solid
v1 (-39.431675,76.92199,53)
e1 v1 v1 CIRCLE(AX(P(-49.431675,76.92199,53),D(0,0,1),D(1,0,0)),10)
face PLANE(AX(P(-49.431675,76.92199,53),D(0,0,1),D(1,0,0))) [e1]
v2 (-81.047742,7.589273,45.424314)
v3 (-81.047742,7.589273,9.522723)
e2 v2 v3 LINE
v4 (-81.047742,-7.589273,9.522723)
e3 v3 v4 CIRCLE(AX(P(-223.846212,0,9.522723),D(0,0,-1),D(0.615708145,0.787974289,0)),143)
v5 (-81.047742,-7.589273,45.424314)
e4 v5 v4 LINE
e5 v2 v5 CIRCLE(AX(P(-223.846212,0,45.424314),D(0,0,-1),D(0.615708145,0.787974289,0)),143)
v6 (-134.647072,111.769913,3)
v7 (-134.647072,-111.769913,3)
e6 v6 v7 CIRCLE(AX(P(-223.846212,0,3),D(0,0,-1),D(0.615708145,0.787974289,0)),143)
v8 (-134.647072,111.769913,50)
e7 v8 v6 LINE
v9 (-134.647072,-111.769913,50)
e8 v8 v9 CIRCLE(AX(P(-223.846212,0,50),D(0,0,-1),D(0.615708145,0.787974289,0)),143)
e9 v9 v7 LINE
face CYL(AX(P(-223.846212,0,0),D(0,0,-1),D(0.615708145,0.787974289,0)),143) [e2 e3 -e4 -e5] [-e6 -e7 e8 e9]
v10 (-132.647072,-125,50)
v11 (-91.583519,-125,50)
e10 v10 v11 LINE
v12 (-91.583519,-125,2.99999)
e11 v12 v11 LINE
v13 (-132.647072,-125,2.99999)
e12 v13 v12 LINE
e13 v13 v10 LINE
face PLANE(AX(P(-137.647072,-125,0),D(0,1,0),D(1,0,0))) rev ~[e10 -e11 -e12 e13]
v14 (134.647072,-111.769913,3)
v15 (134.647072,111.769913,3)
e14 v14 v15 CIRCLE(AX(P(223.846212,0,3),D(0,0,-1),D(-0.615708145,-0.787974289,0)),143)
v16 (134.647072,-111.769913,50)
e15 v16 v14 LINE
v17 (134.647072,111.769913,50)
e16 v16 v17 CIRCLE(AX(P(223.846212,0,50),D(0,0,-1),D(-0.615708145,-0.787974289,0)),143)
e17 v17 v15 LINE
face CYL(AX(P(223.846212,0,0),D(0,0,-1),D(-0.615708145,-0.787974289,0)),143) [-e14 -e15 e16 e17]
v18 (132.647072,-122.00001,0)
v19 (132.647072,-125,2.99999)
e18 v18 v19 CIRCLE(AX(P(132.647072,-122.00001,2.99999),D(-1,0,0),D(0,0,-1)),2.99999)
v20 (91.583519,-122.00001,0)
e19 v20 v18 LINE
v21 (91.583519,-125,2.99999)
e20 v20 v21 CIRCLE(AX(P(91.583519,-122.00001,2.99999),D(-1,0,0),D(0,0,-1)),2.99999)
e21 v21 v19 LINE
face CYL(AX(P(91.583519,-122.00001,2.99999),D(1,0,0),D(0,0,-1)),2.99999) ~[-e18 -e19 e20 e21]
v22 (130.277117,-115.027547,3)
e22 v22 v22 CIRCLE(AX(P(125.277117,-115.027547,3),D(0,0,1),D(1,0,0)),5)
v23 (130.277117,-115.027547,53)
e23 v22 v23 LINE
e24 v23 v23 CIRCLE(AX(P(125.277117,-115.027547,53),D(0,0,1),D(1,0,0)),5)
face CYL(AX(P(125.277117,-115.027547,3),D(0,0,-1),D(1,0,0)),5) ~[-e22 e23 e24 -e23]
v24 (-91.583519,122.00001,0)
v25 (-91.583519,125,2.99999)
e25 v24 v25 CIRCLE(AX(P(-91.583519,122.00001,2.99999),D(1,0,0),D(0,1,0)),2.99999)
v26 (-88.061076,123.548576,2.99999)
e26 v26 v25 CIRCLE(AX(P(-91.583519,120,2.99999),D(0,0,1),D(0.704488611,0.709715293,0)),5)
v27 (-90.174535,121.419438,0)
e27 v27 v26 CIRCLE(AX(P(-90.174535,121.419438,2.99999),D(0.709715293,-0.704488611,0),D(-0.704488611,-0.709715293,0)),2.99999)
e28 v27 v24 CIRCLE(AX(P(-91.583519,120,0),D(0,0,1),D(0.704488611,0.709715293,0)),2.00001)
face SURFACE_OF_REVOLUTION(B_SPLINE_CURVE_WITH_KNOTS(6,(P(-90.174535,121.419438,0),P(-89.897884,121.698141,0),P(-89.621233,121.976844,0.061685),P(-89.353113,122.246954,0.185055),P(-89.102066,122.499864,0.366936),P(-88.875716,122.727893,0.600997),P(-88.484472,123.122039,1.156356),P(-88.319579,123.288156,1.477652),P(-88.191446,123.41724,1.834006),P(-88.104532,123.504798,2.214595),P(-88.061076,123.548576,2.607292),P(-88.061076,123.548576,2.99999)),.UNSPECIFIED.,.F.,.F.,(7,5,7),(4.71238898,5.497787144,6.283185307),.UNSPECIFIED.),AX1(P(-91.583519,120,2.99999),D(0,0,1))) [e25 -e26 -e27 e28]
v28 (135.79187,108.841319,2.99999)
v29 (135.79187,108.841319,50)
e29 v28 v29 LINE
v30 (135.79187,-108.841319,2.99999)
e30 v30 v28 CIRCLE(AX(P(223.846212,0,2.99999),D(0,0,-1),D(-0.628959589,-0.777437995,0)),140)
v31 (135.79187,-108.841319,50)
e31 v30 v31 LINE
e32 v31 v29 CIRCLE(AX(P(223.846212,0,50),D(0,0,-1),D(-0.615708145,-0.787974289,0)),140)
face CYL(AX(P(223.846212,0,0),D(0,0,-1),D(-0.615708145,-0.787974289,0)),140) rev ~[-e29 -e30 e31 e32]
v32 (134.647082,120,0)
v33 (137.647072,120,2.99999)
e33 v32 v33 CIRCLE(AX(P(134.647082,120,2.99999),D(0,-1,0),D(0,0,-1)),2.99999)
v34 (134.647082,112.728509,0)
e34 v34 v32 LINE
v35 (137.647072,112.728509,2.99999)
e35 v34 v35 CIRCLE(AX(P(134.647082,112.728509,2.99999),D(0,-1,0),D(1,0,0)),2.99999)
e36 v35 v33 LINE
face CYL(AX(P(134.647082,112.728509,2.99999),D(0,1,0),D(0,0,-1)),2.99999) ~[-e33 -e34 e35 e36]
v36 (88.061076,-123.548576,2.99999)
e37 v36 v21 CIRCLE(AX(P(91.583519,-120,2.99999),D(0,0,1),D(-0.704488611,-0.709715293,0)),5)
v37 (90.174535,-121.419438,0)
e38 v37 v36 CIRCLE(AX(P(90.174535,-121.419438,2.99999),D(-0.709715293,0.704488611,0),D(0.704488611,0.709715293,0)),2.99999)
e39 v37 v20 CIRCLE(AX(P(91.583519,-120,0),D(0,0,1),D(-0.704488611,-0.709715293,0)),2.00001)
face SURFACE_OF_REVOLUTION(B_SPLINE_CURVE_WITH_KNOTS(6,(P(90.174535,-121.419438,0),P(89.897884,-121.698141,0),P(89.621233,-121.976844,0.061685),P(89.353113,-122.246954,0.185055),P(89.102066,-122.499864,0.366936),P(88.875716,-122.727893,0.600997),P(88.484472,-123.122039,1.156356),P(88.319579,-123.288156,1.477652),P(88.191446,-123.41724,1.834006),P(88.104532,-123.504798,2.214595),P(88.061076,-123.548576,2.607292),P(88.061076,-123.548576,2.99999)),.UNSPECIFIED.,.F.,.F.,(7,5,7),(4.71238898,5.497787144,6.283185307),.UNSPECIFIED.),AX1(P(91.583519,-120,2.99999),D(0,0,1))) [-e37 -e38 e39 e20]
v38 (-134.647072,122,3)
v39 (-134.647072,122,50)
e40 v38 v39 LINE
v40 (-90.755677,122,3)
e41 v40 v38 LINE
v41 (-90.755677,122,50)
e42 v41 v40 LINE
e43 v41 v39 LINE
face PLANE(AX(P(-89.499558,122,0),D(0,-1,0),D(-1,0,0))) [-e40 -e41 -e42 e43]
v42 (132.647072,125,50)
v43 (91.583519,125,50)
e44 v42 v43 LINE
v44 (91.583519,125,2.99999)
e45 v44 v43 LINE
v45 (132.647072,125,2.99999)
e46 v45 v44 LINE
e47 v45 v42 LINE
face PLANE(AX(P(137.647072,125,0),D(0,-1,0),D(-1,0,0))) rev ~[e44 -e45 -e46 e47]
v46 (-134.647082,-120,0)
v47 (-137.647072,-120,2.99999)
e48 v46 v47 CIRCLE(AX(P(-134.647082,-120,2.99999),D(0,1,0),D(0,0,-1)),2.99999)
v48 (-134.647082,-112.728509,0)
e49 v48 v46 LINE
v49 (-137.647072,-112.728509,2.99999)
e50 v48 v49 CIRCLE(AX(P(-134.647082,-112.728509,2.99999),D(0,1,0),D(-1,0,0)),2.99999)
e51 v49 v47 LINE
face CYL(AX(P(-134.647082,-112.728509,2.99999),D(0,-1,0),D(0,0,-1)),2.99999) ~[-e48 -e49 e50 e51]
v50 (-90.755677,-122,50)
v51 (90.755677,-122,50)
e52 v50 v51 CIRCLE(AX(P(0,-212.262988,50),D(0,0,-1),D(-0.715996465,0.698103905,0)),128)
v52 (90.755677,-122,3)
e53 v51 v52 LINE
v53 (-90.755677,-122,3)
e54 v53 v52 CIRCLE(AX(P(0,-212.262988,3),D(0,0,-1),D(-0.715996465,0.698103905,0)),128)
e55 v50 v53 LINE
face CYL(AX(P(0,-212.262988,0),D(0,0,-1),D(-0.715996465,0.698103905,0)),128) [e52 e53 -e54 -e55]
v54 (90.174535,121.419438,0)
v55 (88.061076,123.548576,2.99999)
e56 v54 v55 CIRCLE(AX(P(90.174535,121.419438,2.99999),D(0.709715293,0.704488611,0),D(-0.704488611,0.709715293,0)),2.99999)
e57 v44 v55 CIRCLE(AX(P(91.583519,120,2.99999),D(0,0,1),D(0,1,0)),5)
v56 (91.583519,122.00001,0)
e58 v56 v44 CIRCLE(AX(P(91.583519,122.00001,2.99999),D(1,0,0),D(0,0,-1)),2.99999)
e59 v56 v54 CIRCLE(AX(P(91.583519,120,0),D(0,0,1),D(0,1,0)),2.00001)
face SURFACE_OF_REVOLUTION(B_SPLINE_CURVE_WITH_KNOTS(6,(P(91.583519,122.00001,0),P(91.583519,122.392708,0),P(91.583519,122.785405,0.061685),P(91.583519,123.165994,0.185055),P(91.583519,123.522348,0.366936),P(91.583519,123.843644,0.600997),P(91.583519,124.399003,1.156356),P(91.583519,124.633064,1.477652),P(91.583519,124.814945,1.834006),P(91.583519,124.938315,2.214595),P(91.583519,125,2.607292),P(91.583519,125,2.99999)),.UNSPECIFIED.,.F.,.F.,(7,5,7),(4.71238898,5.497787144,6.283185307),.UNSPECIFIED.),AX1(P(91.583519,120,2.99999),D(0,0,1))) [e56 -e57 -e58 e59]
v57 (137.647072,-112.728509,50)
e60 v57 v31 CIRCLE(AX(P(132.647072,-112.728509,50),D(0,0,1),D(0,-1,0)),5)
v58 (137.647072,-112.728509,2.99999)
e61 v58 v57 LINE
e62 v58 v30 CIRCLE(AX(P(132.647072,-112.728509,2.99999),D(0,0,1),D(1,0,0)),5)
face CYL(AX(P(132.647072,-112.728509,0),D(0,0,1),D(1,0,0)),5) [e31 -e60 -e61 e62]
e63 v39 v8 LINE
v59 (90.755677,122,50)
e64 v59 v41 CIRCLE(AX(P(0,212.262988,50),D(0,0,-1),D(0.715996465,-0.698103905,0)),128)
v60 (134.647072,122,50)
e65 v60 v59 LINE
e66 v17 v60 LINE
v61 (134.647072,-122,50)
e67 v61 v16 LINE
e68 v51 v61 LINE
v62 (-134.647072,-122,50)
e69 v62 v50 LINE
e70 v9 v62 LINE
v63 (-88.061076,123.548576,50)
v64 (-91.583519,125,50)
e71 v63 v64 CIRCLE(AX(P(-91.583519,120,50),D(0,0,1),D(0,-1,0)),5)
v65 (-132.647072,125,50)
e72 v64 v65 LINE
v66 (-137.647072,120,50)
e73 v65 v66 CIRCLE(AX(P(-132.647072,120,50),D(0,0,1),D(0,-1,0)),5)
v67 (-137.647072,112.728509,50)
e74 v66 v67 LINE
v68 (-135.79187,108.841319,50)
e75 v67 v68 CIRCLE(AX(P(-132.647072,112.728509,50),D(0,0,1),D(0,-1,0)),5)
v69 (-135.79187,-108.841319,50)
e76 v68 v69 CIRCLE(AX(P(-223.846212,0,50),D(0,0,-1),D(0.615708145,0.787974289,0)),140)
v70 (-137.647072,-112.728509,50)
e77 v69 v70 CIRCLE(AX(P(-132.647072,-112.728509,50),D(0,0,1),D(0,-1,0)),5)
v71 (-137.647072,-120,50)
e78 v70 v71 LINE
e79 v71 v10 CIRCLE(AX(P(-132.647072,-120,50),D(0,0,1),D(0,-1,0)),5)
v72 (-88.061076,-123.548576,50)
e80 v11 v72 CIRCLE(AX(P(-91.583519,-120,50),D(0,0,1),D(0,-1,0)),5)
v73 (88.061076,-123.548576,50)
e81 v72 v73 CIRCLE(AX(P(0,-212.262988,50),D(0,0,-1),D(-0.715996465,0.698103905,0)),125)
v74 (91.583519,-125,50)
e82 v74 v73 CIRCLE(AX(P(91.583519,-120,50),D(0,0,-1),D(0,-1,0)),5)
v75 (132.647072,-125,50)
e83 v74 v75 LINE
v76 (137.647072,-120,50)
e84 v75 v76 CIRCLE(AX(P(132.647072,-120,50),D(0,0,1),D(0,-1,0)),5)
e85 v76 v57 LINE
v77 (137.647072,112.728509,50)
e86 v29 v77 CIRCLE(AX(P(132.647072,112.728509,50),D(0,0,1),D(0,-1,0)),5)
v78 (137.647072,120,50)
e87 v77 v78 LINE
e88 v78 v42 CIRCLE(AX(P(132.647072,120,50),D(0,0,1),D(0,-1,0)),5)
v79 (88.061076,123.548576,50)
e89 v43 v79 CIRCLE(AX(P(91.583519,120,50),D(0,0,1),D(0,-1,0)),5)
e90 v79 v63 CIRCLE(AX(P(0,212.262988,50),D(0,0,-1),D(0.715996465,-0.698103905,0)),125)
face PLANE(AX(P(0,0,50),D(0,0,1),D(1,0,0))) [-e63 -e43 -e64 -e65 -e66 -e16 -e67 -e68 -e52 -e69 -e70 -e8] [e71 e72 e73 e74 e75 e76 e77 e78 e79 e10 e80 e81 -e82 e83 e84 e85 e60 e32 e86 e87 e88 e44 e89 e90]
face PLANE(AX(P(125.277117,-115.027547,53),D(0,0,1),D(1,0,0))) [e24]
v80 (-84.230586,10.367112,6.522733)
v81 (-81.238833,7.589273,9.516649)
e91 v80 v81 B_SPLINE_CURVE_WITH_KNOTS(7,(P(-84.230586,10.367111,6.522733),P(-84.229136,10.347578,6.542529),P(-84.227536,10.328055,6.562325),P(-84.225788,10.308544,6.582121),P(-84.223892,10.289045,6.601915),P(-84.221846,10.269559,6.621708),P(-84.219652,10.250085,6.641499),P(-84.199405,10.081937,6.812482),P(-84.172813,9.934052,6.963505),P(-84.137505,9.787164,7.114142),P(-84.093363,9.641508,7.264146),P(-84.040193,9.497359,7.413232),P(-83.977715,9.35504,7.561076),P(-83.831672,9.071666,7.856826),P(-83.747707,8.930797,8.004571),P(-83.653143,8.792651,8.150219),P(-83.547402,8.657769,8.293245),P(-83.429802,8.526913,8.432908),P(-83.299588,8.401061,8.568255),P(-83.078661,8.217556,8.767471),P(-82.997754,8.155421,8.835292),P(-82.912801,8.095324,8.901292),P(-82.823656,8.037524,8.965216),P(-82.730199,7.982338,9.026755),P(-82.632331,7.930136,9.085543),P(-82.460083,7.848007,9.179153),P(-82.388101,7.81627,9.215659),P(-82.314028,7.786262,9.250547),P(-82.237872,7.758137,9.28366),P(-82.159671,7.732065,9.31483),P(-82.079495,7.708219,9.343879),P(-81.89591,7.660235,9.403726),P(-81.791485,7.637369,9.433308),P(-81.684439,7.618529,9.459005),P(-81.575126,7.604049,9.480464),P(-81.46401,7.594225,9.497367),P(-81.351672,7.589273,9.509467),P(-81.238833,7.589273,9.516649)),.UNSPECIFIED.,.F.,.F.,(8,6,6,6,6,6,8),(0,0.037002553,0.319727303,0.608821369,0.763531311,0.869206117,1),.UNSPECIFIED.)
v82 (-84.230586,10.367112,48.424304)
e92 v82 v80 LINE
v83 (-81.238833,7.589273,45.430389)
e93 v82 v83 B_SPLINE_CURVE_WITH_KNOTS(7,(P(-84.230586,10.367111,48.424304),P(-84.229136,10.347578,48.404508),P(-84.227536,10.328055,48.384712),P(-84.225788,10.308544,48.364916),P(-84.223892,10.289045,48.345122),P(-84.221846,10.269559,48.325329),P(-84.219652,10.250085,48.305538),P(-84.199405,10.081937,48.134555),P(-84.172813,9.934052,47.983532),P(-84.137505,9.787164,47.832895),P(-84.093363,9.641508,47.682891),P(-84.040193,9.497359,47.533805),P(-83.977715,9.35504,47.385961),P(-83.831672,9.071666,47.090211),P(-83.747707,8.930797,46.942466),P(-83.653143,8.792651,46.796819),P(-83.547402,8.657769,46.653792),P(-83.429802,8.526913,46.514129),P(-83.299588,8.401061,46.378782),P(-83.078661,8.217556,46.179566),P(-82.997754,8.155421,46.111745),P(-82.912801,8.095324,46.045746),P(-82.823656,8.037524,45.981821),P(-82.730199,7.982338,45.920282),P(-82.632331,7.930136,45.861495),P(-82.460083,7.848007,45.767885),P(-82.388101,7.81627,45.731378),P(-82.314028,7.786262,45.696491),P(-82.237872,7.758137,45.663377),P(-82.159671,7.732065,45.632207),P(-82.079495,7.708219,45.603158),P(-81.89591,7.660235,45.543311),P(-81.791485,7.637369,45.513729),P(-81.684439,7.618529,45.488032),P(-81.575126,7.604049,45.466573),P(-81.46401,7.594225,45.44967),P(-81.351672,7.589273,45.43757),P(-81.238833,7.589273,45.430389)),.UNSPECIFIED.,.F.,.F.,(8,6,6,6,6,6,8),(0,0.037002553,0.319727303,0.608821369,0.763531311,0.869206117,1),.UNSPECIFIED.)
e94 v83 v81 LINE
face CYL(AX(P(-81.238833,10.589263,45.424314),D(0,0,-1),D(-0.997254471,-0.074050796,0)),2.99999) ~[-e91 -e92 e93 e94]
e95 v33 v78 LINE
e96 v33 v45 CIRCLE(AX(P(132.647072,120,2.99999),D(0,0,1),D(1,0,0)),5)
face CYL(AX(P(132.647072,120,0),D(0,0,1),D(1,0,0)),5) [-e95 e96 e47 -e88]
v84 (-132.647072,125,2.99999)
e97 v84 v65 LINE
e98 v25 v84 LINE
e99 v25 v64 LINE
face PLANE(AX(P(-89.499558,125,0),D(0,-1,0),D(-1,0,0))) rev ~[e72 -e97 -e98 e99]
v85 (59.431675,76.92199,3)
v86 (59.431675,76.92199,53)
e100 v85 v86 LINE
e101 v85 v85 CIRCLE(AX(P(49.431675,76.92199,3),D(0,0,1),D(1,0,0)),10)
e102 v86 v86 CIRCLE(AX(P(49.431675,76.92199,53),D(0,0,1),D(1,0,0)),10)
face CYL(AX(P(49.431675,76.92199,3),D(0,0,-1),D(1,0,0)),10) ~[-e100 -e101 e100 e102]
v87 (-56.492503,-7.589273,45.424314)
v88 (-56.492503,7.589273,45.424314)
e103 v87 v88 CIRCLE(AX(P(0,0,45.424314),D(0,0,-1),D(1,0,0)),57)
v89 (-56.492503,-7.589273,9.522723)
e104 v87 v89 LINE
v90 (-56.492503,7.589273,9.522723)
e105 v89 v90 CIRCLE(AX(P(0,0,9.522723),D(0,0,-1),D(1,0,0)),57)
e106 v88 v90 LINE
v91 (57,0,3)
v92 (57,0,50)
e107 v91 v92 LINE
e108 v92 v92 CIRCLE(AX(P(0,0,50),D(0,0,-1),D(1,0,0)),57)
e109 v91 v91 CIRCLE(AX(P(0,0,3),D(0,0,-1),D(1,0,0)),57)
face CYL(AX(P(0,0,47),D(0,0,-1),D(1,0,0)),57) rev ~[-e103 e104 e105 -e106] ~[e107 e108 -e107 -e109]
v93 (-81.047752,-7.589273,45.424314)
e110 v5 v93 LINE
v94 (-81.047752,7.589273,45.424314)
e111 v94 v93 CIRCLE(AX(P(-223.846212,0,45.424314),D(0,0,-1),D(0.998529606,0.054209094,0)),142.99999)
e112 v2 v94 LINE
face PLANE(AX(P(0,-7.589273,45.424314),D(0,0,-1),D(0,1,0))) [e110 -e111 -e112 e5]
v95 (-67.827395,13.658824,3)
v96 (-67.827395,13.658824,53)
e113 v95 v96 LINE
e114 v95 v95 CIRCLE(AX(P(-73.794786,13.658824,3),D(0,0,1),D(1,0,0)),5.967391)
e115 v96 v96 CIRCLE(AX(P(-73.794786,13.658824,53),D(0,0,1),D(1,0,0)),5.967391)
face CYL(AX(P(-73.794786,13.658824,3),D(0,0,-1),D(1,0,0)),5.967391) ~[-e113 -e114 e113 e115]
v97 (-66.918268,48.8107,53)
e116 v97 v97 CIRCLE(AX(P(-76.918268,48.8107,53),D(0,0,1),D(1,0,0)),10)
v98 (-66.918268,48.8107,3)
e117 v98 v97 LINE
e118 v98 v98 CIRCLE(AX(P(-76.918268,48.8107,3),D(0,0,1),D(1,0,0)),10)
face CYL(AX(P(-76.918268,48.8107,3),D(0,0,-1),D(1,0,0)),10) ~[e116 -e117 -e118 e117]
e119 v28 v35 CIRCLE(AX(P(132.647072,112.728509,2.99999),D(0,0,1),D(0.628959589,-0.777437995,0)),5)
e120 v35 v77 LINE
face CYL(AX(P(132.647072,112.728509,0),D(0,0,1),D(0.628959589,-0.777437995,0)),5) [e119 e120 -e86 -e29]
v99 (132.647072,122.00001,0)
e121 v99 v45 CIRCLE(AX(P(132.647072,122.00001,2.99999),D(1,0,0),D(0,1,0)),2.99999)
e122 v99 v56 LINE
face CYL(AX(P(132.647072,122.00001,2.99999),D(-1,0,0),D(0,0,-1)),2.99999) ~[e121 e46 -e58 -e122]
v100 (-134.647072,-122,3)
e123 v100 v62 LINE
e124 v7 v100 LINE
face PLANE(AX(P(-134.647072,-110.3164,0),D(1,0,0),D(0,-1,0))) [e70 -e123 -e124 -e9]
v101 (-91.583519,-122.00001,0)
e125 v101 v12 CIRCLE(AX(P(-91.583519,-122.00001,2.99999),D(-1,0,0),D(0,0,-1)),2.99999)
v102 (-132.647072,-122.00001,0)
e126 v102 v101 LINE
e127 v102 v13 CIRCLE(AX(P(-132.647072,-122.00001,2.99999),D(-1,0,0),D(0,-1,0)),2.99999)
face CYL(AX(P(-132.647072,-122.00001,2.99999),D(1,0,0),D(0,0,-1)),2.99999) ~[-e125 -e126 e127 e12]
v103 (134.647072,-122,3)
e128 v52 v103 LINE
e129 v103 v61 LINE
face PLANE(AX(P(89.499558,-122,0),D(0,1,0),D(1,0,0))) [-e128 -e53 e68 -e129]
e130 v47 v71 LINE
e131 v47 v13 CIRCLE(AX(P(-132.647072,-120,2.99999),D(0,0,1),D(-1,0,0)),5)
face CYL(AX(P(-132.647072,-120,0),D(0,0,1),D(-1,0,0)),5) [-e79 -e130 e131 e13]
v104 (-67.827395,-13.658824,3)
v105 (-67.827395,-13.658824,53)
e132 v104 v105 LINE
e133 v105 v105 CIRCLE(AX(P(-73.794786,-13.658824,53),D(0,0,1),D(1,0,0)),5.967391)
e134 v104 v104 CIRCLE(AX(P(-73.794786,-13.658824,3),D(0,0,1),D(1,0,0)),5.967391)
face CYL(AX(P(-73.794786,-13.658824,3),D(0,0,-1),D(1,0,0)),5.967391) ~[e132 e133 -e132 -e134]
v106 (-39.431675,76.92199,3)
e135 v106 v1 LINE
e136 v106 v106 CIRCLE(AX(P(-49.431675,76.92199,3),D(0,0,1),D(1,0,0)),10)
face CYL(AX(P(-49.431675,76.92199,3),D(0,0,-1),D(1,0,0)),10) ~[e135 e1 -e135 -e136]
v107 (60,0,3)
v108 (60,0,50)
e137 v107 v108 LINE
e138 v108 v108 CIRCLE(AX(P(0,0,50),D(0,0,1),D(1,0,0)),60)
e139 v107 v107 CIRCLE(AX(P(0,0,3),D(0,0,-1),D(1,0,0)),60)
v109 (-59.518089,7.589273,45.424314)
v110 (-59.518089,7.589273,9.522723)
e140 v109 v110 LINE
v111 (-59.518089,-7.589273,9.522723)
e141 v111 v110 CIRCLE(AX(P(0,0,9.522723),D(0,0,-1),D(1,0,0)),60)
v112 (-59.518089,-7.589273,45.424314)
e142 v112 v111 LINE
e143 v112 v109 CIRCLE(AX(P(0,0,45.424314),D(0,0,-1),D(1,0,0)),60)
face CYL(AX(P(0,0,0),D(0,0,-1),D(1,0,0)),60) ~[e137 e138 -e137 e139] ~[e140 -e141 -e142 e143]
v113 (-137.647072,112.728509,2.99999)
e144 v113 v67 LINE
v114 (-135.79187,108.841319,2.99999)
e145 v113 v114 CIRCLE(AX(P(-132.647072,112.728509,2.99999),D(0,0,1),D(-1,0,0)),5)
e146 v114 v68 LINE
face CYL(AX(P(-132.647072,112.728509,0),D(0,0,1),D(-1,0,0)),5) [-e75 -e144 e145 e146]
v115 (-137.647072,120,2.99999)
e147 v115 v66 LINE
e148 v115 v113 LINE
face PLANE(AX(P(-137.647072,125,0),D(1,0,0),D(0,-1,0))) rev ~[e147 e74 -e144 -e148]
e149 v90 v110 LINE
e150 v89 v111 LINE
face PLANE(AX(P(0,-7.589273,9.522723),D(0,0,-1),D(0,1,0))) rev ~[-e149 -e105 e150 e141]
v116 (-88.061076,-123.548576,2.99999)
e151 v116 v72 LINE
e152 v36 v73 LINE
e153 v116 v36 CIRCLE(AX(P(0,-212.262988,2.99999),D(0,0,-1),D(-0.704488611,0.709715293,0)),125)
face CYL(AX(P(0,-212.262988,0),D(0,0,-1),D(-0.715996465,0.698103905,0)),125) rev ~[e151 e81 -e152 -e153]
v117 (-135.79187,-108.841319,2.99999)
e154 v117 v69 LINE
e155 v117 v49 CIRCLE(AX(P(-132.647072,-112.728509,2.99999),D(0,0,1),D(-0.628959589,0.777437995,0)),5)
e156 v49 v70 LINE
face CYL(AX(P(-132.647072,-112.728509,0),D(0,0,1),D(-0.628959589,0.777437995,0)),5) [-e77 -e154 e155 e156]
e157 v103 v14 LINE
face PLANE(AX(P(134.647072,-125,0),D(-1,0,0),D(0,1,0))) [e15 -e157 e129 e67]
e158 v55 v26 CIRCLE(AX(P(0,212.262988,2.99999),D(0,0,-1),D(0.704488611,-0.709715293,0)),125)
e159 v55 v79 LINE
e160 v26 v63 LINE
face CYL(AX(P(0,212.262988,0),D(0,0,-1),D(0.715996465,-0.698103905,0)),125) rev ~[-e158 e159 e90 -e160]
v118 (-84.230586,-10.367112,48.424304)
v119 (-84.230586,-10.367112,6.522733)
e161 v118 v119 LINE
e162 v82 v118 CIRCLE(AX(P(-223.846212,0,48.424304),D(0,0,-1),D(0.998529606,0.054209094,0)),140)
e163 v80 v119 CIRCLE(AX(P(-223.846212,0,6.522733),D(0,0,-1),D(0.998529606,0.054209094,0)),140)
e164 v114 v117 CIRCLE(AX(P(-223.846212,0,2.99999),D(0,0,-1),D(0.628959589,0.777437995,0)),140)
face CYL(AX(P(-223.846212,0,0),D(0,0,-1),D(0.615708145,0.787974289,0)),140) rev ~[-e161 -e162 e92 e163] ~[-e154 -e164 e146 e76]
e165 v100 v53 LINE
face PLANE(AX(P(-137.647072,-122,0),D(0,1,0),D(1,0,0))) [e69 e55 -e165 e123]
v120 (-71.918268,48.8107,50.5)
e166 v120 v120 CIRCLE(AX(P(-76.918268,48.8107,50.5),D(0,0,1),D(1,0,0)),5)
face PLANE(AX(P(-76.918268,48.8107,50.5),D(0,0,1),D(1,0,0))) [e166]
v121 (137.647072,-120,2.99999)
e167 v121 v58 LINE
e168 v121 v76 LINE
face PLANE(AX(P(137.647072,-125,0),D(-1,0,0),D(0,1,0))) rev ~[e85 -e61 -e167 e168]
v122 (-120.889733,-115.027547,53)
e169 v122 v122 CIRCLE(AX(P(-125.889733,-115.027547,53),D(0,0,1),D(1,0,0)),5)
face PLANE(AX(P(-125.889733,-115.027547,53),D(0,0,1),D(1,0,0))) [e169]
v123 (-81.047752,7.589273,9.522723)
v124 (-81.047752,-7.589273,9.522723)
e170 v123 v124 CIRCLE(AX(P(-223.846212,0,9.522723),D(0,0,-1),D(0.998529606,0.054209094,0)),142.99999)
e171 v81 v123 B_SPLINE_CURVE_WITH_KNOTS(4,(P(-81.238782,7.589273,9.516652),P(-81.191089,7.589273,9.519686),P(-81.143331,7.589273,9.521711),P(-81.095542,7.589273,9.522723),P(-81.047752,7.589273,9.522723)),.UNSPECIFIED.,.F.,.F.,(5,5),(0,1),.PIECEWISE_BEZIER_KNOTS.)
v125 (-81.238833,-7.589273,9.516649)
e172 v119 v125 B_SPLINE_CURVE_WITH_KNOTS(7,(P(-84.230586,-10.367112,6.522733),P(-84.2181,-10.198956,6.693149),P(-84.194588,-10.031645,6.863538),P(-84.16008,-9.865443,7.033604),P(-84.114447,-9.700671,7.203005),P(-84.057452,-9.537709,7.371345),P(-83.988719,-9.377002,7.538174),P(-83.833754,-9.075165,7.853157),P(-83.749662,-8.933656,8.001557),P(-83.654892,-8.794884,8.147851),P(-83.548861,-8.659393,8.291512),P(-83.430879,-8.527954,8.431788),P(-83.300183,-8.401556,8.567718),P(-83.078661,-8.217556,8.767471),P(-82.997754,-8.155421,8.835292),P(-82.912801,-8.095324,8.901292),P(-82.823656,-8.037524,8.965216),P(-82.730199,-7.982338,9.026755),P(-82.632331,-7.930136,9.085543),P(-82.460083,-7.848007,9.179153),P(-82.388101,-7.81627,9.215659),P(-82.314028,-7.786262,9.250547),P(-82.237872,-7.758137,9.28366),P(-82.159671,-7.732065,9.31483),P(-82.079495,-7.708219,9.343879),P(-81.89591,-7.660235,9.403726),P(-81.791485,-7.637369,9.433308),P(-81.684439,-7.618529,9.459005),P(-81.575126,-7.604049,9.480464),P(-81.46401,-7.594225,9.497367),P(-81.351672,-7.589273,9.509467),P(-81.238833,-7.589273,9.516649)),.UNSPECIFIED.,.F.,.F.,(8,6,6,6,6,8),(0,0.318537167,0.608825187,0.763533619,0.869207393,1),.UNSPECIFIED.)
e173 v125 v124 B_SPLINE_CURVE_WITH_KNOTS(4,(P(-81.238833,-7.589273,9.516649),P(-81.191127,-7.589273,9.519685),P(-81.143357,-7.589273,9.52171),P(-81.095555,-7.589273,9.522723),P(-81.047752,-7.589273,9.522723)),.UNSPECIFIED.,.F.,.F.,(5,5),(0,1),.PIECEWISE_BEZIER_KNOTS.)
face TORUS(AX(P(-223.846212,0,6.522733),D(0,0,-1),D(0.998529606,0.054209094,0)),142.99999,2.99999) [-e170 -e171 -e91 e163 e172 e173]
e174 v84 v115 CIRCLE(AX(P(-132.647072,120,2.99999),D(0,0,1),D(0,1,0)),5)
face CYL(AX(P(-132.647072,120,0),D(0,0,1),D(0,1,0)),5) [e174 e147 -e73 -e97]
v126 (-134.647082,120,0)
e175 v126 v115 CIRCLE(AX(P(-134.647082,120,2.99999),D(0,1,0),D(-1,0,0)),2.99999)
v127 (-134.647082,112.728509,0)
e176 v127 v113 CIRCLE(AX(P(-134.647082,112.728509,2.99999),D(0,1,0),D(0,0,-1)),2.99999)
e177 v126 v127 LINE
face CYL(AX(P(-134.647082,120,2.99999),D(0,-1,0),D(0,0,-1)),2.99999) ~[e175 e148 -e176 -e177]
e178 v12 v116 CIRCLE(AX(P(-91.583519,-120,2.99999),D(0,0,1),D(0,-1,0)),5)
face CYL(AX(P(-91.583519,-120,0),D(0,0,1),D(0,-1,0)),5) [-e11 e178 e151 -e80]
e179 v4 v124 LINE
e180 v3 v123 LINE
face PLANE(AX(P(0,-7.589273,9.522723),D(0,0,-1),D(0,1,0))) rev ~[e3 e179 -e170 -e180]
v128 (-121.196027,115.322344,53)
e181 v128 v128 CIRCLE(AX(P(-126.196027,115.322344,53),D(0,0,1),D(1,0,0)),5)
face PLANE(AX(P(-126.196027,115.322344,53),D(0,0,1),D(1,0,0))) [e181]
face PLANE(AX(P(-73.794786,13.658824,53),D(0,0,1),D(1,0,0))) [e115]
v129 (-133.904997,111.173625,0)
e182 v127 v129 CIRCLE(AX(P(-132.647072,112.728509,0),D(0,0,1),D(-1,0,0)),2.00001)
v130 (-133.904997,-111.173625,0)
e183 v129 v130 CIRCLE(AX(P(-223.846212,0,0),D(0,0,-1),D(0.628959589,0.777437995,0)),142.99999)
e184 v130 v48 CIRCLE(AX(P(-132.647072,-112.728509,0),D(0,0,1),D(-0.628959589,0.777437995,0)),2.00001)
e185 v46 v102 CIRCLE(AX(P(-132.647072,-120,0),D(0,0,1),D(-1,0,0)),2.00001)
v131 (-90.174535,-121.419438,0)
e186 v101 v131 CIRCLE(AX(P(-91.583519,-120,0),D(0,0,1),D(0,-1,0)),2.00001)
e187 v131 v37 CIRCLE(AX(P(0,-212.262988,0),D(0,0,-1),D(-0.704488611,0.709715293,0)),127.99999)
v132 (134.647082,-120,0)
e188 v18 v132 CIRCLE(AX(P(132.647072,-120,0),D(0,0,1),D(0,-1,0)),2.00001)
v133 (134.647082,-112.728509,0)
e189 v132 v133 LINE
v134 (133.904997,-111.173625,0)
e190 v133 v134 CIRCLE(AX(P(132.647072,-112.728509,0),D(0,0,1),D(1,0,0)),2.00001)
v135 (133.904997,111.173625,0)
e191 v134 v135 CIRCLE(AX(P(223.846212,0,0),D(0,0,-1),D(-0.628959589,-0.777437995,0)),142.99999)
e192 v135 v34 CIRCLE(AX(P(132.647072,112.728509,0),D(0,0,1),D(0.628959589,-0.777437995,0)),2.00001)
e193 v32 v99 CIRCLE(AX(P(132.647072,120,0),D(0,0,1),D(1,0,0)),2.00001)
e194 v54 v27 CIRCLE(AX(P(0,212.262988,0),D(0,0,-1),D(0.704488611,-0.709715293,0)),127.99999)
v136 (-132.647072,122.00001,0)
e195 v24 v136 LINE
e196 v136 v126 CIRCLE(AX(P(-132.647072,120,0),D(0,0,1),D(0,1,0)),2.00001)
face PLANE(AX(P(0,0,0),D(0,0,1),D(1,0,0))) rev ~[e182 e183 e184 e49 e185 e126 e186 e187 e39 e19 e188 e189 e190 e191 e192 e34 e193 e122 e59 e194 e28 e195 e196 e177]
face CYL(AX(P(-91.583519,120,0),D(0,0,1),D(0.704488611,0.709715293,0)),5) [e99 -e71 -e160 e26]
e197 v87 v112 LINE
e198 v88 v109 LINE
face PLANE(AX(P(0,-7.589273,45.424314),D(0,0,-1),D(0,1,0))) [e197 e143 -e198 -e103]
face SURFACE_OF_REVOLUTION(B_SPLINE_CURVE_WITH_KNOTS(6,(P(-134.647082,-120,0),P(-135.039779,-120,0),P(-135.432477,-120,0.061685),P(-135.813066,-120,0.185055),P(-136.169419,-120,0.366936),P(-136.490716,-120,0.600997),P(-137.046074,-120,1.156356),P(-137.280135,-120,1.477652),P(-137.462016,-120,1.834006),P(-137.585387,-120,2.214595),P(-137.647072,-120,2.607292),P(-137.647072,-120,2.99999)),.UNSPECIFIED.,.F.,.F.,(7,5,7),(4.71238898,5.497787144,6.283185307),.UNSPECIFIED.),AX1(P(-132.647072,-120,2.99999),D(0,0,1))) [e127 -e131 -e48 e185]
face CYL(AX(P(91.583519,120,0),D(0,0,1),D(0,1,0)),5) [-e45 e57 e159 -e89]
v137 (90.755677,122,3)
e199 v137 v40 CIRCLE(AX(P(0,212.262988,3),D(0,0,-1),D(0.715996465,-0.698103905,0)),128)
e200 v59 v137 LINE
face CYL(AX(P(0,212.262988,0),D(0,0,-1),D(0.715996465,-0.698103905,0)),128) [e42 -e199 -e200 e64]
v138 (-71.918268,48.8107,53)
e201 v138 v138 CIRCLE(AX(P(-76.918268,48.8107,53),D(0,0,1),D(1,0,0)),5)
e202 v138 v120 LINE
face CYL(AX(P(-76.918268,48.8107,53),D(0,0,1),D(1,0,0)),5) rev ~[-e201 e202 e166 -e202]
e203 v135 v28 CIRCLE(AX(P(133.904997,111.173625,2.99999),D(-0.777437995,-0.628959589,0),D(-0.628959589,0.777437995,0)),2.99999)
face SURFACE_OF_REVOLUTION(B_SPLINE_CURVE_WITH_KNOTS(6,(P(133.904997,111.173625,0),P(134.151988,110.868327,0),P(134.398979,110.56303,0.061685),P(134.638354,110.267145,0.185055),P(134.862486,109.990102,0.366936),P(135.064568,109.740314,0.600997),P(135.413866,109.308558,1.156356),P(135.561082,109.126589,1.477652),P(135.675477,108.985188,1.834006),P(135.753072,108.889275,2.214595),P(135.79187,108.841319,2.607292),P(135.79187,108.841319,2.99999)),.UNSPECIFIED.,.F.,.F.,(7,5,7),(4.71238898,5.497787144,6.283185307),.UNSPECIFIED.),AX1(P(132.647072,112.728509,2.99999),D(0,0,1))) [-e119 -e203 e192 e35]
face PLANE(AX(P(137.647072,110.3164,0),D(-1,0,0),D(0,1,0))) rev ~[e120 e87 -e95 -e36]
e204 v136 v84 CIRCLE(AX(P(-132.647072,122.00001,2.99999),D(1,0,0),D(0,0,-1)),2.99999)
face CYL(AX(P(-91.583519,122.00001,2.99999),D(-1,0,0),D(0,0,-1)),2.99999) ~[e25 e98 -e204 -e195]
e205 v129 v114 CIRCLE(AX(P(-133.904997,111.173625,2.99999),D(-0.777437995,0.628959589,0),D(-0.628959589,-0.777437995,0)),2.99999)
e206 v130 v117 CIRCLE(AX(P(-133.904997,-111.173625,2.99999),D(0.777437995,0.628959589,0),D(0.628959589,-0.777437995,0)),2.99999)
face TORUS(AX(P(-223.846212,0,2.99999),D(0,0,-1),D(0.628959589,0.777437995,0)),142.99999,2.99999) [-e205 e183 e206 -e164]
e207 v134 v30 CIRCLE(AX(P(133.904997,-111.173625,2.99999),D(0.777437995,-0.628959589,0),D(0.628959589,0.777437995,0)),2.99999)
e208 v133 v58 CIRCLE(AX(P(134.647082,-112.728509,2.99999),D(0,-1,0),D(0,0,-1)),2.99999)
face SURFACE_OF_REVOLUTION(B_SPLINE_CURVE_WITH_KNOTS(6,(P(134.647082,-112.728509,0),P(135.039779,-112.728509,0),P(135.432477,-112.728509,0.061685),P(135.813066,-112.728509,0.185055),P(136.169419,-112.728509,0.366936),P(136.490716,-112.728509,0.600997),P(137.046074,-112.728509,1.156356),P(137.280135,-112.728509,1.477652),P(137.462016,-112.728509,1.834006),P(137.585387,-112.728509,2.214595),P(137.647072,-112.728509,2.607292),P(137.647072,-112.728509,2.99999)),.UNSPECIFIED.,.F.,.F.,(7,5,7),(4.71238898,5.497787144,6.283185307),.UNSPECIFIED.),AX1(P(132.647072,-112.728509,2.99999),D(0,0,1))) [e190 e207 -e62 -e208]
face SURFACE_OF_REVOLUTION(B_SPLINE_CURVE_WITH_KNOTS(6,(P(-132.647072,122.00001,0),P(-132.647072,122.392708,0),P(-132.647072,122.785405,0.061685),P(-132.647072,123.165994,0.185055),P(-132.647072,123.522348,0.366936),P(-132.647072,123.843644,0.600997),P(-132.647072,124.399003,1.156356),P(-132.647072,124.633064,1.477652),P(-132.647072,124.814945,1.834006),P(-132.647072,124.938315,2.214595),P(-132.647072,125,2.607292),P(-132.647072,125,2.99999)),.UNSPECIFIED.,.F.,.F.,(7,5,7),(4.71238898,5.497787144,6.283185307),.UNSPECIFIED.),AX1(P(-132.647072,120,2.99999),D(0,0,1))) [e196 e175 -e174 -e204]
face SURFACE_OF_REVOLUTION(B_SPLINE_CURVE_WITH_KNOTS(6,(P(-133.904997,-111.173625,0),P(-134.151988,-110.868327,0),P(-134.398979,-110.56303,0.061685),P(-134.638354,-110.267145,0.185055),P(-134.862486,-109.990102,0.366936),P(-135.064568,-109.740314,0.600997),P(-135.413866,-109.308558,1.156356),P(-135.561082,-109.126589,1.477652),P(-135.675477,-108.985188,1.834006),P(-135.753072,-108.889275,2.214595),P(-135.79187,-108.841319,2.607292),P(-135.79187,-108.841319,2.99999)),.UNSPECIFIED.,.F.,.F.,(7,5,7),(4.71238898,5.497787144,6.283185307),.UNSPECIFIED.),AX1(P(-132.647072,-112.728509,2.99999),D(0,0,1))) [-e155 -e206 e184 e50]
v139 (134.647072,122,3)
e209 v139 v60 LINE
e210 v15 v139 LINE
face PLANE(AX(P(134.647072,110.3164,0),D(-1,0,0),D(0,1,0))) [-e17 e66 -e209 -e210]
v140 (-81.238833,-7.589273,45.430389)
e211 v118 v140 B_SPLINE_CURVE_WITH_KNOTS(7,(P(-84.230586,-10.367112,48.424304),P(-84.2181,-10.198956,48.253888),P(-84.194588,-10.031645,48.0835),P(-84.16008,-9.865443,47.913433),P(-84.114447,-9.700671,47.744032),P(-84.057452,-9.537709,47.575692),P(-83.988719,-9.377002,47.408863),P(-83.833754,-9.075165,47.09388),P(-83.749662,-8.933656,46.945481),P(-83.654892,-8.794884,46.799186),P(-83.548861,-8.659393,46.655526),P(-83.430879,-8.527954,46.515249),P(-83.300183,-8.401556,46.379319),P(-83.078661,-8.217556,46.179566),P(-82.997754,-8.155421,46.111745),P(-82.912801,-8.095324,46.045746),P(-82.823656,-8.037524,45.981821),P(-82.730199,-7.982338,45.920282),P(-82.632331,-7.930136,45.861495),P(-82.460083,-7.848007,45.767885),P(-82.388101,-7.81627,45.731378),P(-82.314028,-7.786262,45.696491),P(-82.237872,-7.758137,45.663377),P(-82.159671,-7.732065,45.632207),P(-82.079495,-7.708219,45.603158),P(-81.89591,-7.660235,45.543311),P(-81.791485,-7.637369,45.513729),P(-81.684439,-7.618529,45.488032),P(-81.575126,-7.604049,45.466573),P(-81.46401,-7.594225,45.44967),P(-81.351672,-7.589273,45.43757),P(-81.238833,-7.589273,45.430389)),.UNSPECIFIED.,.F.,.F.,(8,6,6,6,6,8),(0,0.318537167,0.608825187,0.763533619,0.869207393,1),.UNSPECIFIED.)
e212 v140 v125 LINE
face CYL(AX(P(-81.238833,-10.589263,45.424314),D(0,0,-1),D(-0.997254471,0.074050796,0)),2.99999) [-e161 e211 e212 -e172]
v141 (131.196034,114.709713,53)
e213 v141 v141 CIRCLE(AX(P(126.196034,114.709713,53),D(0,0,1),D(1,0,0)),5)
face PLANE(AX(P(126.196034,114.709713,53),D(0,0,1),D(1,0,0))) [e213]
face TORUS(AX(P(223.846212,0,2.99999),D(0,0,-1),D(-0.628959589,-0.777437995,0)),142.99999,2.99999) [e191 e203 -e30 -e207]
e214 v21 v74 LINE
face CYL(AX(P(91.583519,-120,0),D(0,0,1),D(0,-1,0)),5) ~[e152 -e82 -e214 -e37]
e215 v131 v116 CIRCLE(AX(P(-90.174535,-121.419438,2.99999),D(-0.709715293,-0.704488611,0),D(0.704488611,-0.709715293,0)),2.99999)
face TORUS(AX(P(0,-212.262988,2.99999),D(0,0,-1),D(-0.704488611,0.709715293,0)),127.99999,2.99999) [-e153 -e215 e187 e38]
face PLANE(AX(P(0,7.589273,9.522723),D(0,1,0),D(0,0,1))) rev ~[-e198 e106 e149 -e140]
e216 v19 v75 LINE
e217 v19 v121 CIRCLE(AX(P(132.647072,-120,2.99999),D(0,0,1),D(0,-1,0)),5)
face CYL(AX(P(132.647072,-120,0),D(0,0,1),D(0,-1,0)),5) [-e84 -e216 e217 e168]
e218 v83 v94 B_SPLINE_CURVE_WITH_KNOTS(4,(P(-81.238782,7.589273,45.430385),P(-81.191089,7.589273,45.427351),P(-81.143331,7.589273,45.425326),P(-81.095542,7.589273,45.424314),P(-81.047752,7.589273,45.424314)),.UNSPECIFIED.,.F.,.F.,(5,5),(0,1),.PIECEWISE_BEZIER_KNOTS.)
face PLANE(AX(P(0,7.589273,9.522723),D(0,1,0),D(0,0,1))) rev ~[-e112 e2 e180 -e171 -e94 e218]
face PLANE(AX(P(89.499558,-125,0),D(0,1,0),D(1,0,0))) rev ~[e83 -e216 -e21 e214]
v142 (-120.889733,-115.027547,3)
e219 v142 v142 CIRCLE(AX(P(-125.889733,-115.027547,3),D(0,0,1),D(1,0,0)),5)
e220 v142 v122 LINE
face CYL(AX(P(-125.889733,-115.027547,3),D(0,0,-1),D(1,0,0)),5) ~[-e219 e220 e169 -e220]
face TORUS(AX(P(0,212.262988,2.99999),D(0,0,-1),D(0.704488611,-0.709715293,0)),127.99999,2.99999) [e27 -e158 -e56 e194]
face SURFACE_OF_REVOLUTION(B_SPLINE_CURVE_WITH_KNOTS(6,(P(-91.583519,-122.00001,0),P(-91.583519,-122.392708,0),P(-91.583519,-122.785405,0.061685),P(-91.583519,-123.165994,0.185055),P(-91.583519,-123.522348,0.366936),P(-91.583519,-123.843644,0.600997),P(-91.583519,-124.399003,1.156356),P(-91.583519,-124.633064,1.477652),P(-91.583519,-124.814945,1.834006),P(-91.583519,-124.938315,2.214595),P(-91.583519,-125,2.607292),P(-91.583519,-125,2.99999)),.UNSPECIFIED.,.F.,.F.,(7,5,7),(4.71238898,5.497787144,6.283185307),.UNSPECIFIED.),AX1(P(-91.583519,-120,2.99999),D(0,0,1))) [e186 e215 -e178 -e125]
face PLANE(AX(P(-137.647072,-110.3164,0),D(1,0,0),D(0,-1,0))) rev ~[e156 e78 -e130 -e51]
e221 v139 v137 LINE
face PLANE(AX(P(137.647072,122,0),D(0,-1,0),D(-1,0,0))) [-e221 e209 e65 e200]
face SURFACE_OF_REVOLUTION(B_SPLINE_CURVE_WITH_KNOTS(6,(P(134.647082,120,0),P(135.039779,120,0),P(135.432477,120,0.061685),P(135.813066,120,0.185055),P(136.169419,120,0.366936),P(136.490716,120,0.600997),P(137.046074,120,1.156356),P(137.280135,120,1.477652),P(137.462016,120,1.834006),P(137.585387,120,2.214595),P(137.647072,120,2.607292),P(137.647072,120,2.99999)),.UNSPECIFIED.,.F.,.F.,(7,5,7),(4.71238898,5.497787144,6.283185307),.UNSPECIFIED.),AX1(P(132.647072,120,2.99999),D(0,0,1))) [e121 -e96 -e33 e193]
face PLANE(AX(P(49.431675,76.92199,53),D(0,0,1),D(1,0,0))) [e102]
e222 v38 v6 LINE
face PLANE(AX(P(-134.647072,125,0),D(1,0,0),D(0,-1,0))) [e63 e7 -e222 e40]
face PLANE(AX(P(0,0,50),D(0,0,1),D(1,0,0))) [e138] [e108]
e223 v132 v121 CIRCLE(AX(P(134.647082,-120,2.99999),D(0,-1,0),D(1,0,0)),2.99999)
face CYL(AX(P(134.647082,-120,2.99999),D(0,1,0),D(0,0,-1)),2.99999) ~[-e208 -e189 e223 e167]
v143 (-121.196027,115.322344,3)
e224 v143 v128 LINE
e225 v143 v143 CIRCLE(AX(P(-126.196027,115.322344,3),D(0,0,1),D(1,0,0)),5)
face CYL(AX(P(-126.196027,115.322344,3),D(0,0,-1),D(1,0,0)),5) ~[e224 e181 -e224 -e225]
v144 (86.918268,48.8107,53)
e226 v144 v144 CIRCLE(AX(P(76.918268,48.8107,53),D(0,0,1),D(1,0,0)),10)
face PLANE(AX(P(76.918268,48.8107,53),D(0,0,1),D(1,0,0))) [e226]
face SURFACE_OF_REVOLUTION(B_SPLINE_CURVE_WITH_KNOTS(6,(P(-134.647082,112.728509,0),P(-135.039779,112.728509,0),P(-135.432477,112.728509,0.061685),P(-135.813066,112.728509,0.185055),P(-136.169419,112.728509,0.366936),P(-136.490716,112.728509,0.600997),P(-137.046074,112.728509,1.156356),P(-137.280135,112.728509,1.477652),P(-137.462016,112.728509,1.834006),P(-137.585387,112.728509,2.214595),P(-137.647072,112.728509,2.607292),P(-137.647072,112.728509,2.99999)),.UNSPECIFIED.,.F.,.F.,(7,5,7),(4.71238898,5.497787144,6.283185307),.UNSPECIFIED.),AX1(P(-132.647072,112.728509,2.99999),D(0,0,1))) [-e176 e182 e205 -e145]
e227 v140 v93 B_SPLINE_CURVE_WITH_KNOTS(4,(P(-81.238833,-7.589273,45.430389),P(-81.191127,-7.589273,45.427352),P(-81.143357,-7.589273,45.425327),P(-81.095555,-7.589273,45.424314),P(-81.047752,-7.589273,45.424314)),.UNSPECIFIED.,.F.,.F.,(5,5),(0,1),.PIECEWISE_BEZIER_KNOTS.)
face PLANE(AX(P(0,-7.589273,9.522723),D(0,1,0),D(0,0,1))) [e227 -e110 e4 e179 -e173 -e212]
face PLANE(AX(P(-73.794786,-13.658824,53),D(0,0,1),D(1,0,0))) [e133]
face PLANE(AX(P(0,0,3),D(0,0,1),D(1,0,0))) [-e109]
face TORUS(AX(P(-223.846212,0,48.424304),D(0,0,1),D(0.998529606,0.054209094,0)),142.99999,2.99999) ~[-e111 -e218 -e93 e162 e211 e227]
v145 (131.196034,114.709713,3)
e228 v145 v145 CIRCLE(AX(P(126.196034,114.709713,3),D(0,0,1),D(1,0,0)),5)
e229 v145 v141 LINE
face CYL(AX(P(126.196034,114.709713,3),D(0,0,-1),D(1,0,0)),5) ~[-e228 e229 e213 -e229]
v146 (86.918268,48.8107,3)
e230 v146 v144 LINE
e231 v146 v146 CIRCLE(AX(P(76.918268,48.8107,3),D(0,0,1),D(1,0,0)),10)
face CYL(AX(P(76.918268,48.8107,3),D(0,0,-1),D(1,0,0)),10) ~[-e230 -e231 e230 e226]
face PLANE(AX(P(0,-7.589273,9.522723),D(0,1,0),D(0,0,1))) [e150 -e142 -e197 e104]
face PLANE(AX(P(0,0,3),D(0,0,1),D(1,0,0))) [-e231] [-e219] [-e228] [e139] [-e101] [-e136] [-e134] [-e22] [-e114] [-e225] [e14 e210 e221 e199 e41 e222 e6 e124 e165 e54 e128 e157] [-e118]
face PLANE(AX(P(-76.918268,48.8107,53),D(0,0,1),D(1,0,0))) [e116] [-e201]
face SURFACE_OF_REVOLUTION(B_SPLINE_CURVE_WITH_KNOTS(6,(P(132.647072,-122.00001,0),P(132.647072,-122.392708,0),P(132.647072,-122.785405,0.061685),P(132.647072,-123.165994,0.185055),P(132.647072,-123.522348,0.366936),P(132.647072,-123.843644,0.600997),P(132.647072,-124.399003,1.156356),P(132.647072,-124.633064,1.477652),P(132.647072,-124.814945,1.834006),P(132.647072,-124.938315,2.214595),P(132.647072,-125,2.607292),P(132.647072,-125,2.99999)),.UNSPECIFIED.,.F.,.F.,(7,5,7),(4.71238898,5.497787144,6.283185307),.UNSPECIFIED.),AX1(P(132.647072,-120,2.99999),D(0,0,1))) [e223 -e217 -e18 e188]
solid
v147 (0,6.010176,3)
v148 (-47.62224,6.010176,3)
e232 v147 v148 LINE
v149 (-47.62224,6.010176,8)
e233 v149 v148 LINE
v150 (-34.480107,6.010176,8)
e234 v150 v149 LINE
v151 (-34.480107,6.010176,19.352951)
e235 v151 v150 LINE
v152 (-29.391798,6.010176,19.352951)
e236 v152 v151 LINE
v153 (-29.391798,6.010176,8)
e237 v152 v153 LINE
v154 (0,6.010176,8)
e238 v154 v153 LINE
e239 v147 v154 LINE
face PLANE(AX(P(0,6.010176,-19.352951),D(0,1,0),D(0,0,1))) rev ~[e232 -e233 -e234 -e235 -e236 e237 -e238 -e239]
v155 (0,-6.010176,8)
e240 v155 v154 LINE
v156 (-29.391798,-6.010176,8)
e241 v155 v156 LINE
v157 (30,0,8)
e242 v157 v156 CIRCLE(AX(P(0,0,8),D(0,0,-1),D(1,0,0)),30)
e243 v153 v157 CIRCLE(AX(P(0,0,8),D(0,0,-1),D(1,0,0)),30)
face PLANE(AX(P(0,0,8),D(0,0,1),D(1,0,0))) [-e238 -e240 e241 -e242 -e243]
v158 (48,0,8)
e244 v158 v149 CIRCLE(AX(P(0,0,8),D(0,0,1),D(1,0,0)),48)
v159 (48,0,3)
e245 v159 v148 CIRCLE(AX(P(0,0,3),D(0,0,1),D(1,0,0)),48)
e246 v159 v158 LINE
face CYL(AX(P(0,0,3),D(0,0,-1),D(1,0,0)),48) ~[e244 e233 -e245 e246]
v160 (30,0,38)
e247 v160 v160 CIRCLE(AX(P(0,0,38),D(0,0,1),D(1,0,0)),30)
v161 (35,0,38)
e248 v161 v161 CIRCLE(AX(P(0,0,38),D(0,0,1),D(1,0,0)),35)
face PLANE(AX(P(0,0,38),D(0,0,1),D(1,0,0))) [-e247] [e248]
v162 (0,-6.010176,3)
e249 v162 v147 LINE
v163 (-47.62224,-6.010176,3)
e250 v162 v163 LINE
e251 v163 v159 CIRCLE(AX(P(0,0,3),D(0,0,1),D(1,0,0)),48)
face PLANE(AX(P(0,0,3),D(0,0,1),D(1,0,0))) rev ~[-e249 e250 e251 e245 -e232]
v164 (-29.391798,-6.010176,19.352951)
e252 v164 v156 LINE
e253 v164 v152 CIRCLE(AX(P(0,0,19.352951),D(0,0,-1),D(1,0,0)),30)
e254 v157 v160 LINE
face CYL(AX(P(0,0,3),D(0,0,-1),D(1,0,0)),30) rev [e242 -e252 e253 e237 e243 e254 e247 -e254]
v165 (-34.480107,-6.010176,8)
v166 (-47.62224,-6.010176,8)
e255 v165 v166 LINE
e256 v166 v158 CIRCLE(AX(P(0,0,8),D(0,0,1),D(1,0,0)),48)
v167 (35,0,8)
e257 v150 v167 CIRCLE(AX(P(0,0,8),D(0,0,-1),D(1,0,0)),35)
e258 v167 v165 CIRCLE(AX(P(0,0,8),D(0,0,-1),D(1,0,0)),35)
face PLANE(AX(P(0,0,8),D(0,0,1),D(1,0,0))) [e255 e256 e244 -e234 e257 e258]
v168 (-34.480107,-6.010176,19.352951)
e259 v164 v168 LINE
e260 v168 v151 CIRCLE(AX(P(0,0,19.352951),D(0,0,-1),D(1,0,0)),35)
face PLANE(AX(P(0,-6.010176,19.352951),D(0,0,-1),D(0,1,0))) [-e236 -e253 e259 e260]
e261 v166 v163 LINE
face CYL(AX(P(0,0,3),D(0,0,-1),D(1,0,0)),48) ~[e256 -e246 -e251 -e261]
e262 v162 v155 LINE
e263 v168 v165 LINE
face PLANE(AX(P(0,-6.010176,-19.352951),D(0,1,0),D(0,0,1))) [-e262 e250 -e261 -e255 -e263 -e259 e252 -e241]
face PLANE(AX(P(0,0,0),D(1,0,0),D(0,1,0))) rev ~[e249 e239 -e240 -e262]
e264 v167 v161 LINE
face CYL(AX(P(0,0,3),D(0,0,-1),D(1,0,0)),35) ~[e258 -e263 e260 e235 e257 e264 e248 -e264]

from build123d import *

# Parameters (mm, degrees)
F1_DEPTH  = 50
F2_T      = -3
F3_R      = 5
F4_R      = 60
F5_DEPTH  = 50
F6_T      = -3
F7_W      = 15.1785463095
F7_H      = 35.9015911818
F8_DEPTH  = 106.20223
F9_R      = 10
F9_R_2    = 5.9673908864
F10_DEPTH = 50
F11_R     = 5
F12_DEPTH = 2.5
F13_R     = 35
F14_DEPTH = 35
F15_T     = -5
F16_R     = 48
F17_DEPTH = 5
F18_R     = 5
F19_DEPTH = 50
F20_R     = 2.99999
F21_W     = 12.0203521578
F21_H     = 38.7059021741
F22_DEPTH = 396


# Not quite as in the source:
# - a fillet or chamfer is up to 0.001 mm smaller than in the source, because OpenCascade refuses the exact size
# - an extrude ends at something that could not be found from the text; its depth is read off the source's solid


with BuildPart() as f1:
    # F0 (on Top) → F1 (new body)
    with BuildSketch(Plane.XY):
        with BuildLine():
            Line((89.4995581526, -125), (137.647071664, -125))
            Line((137.647071664, -125), (137.647071664, -110.3164004138))
            ThreePointArc((137.647071664, -110.3164004138), (83.8462120295, 0), (137.647071664, 110.3164004138))
            Line((137.647071664, 110.3164004138), (137.647071664, 125))
            Line((137.647071664, 125), (89.4995581526, 125))
            ThreePointArc((89.4995581526, 125), (0, 87.2629880905), (-89.4995581526, 125))
            Line((-89.4995581526, 125), (-137.647071664, 125))
            Line((-137.647071664, 125), (-137.647071664, 110.3164004138))
            ThreePointArc((-137.647071664, 110.3164004138), (-83.8462120295, 0), (-137.647071664, -110.3164004138))
            Line((-137.647071664, -110.3164004138), (-137.647071664, -125))
            Line((-137.647071664, -125), (-89.4995581526, -125))
            ThreePointArc((-89.4995581526, -125), (0, -87.2629880905), (89.4995581526, -125))
        make_face()
    extrude(amount=F1_DEPTH)

    # F2
    f2_openings = [f1.faces().sort_by_distance(p)[0] for p in [
        (0, 0, 50),
    ]]
    offset(amount=F2_T, openings=f2_openings)

    # F3
    f3_edges = [f1.edges().sort_by_distance(p)[0] for p in [
        (-137.647072, -125, 25),
        (-89.499558, -125, 25),
        (89.499558, -125, 25),
        (137.647072, -125, 25),
        (137.647072, -110.3164, 25),
        (137.647072, 110.3164, 25),
        (137.647072, 125, 25),
        (89.499558, 125, 25),
        (-89.499558, 125, 25),
        (-137.647072, 125, 25),
        (-137.647072, 110.3164, 25),
        (-137.647072, -110.3164, 25),
    ]]
    fillet(f3_edges, radius=F3_R)

    # F4 (on Top) → F5 (join)
    with BuildSketch(Plane.XY):
        Circle(F4_R)
    extrude(amount=F5_DEPTH)

    # F6: a shell. OpenCascade refuses it in one call, so the cavity is built on its own and cut out:
    # the body offset inwards by the wall thickness, plus a prism from it out through each open face.
    f6_core = offset(f1.part, amount=F6_T, kind=Kind.INTERSECTION, mode=Mode.PRIVATE)
    f6_exits = [f6_core.faces().sort_by_distance(p)[0] for p in [
        (0, 0, 47),
    ]]
    add(f6_core, mode=Mode.SUBTRACT)
    extrude(f6_exits, amount=-F6_T, mode=Mode.SUBTRACT)

    # F7 (on Right) → F8 (cut)
    with BuildSketch(Plane.YZ):
        with Locations((0, 27.4735186249)):
            Rectangle(F7_W, F7_H)
    extrude(amount=-F8_DEPTH, mode=Mode.SUBTRACT)

    # F9 (on face) → F10 (join)
    with BuildSketch(Plane.XY.offset(3)):
        with Locations((-49.4316754806, 76.9219902265)):
            Circle(F9_R)
        with Locations((-76.9182676464, 48.8106995034)):
            Circle(F9_R)
        with Locations((-73.7947862563, 13.6588238292)):
            Circle(F9_R_2)
        with Locations((-73.7947862563, -13.6588238292)):
            Circle(F9_R_2)
        with Locations((49.4316754806, 76.9219902265)):
            Circle(F9_R)
        with Locations((76.9182676464, 48.8106995034)):
            Circle(F9_R)
    extrude(amount=F10_DEPTH)

    # F11 (on face) → F12 (cut)
    with BuildSketch(Plane.XY.offset(53)):
        with Locations((-76.9182676464, 48.8106995034)):
            Circle(F11_R)
    extrude(amount=-F12_DEPTH, mode=Mode.SUBTRACT)

    # F18 (on face) → F19 (join)
    with BuildSketch(Plane.XY.offset(3)):
        with Locations((-126.1960268021, 115.3223440051)):
            Circle(F18_R)
        with Locations((126.1960342526, 114.7097125649)):
            Circle(F18_R)
        with Locations((-125.8897334337, -115.0275468826)):
            Circle(F18_R)
        with Locations((125.2771168947, -115.0275468826)):
            Circle(F18_R)
    extrude(amount=F19_DEPTH)

    # F20 (radius 3 in the source; OpenCascade refuses exactly that, so slightly less here)
    f20_edges = [f1.edges().sort_by_distance(p)[0] for p in [
        (112.115296, -125, 0),
        (136.182606, -123.535534, 0),
        (137.647072, -116.364255, 0),
        (137.159498, -110.574906, 0),
        (83.846212, 0, 0),
        (137.159498, 110.574906, 0),
        (137.647072, 116.364255, 0),
        (136.182606, 123.535534, 0),
        (112.115296, 125, 0),
        (89.678642, 124.622926, 0),
        (0, 87.262988, 0),
        (-89.678642, 124.622926, 0),
        (-112.115296, 125, 0),
        (-136.182606, 123.535534, 0),
        (-137.647072, 116.364255, 0),
        (-137.159498, 110.574906, 0),
        (-83.846212, 0, 0),
        (-137.159498, -110.574906, 0),
        (-137.647072, -116.364255, 0),
        (-136.182606, -123.535534, 0),
        (-112.115296, -125, 0),
        (-89.678642, -124.622926, 0),
        (0, -87.262988, 0),
        (89.678642, -124.622926, 0),
        (-84.052067, 7.589273, 27.473519),
        (-84.052067, -7.589273, 27.473519),
        (-83.846212, 0, 45.424314),
        (-83.846212, 0, 9.522723),
    ]]
    fillet(f20_edges, radius=F20_R)


with BuildPart() as f14:
    # F13 (on face) → F14 (new body)
    with BuildSketch(Plane.XY.offset(3)):
        Circle(F13_R)
    extrude(amount=F14_DEPTH)

    # F15
    f15_openings = [f14.faces().sort_by_distance(p)[0] for p in [
        (0, 0, 38),
    ]]
    offset(amount=F15_T, openings=f15_openings)

    # F16 (on face) → F17 (join)
    with BuildSketch(Plane.XY.offset(3)):
        Circle(F16_R)
    extrude(amount=F17_DEPTH)

    # F21 (on Right) → F22 (cut, through all)
    with BuildSketch(Plane.YZ):
        Rectangle(F21_W, F21_H)
    extrude(amount=-F22_DEPTH, mode=Mode.SUBTRACT)


solid = Compound([f1.part, f14.part])
